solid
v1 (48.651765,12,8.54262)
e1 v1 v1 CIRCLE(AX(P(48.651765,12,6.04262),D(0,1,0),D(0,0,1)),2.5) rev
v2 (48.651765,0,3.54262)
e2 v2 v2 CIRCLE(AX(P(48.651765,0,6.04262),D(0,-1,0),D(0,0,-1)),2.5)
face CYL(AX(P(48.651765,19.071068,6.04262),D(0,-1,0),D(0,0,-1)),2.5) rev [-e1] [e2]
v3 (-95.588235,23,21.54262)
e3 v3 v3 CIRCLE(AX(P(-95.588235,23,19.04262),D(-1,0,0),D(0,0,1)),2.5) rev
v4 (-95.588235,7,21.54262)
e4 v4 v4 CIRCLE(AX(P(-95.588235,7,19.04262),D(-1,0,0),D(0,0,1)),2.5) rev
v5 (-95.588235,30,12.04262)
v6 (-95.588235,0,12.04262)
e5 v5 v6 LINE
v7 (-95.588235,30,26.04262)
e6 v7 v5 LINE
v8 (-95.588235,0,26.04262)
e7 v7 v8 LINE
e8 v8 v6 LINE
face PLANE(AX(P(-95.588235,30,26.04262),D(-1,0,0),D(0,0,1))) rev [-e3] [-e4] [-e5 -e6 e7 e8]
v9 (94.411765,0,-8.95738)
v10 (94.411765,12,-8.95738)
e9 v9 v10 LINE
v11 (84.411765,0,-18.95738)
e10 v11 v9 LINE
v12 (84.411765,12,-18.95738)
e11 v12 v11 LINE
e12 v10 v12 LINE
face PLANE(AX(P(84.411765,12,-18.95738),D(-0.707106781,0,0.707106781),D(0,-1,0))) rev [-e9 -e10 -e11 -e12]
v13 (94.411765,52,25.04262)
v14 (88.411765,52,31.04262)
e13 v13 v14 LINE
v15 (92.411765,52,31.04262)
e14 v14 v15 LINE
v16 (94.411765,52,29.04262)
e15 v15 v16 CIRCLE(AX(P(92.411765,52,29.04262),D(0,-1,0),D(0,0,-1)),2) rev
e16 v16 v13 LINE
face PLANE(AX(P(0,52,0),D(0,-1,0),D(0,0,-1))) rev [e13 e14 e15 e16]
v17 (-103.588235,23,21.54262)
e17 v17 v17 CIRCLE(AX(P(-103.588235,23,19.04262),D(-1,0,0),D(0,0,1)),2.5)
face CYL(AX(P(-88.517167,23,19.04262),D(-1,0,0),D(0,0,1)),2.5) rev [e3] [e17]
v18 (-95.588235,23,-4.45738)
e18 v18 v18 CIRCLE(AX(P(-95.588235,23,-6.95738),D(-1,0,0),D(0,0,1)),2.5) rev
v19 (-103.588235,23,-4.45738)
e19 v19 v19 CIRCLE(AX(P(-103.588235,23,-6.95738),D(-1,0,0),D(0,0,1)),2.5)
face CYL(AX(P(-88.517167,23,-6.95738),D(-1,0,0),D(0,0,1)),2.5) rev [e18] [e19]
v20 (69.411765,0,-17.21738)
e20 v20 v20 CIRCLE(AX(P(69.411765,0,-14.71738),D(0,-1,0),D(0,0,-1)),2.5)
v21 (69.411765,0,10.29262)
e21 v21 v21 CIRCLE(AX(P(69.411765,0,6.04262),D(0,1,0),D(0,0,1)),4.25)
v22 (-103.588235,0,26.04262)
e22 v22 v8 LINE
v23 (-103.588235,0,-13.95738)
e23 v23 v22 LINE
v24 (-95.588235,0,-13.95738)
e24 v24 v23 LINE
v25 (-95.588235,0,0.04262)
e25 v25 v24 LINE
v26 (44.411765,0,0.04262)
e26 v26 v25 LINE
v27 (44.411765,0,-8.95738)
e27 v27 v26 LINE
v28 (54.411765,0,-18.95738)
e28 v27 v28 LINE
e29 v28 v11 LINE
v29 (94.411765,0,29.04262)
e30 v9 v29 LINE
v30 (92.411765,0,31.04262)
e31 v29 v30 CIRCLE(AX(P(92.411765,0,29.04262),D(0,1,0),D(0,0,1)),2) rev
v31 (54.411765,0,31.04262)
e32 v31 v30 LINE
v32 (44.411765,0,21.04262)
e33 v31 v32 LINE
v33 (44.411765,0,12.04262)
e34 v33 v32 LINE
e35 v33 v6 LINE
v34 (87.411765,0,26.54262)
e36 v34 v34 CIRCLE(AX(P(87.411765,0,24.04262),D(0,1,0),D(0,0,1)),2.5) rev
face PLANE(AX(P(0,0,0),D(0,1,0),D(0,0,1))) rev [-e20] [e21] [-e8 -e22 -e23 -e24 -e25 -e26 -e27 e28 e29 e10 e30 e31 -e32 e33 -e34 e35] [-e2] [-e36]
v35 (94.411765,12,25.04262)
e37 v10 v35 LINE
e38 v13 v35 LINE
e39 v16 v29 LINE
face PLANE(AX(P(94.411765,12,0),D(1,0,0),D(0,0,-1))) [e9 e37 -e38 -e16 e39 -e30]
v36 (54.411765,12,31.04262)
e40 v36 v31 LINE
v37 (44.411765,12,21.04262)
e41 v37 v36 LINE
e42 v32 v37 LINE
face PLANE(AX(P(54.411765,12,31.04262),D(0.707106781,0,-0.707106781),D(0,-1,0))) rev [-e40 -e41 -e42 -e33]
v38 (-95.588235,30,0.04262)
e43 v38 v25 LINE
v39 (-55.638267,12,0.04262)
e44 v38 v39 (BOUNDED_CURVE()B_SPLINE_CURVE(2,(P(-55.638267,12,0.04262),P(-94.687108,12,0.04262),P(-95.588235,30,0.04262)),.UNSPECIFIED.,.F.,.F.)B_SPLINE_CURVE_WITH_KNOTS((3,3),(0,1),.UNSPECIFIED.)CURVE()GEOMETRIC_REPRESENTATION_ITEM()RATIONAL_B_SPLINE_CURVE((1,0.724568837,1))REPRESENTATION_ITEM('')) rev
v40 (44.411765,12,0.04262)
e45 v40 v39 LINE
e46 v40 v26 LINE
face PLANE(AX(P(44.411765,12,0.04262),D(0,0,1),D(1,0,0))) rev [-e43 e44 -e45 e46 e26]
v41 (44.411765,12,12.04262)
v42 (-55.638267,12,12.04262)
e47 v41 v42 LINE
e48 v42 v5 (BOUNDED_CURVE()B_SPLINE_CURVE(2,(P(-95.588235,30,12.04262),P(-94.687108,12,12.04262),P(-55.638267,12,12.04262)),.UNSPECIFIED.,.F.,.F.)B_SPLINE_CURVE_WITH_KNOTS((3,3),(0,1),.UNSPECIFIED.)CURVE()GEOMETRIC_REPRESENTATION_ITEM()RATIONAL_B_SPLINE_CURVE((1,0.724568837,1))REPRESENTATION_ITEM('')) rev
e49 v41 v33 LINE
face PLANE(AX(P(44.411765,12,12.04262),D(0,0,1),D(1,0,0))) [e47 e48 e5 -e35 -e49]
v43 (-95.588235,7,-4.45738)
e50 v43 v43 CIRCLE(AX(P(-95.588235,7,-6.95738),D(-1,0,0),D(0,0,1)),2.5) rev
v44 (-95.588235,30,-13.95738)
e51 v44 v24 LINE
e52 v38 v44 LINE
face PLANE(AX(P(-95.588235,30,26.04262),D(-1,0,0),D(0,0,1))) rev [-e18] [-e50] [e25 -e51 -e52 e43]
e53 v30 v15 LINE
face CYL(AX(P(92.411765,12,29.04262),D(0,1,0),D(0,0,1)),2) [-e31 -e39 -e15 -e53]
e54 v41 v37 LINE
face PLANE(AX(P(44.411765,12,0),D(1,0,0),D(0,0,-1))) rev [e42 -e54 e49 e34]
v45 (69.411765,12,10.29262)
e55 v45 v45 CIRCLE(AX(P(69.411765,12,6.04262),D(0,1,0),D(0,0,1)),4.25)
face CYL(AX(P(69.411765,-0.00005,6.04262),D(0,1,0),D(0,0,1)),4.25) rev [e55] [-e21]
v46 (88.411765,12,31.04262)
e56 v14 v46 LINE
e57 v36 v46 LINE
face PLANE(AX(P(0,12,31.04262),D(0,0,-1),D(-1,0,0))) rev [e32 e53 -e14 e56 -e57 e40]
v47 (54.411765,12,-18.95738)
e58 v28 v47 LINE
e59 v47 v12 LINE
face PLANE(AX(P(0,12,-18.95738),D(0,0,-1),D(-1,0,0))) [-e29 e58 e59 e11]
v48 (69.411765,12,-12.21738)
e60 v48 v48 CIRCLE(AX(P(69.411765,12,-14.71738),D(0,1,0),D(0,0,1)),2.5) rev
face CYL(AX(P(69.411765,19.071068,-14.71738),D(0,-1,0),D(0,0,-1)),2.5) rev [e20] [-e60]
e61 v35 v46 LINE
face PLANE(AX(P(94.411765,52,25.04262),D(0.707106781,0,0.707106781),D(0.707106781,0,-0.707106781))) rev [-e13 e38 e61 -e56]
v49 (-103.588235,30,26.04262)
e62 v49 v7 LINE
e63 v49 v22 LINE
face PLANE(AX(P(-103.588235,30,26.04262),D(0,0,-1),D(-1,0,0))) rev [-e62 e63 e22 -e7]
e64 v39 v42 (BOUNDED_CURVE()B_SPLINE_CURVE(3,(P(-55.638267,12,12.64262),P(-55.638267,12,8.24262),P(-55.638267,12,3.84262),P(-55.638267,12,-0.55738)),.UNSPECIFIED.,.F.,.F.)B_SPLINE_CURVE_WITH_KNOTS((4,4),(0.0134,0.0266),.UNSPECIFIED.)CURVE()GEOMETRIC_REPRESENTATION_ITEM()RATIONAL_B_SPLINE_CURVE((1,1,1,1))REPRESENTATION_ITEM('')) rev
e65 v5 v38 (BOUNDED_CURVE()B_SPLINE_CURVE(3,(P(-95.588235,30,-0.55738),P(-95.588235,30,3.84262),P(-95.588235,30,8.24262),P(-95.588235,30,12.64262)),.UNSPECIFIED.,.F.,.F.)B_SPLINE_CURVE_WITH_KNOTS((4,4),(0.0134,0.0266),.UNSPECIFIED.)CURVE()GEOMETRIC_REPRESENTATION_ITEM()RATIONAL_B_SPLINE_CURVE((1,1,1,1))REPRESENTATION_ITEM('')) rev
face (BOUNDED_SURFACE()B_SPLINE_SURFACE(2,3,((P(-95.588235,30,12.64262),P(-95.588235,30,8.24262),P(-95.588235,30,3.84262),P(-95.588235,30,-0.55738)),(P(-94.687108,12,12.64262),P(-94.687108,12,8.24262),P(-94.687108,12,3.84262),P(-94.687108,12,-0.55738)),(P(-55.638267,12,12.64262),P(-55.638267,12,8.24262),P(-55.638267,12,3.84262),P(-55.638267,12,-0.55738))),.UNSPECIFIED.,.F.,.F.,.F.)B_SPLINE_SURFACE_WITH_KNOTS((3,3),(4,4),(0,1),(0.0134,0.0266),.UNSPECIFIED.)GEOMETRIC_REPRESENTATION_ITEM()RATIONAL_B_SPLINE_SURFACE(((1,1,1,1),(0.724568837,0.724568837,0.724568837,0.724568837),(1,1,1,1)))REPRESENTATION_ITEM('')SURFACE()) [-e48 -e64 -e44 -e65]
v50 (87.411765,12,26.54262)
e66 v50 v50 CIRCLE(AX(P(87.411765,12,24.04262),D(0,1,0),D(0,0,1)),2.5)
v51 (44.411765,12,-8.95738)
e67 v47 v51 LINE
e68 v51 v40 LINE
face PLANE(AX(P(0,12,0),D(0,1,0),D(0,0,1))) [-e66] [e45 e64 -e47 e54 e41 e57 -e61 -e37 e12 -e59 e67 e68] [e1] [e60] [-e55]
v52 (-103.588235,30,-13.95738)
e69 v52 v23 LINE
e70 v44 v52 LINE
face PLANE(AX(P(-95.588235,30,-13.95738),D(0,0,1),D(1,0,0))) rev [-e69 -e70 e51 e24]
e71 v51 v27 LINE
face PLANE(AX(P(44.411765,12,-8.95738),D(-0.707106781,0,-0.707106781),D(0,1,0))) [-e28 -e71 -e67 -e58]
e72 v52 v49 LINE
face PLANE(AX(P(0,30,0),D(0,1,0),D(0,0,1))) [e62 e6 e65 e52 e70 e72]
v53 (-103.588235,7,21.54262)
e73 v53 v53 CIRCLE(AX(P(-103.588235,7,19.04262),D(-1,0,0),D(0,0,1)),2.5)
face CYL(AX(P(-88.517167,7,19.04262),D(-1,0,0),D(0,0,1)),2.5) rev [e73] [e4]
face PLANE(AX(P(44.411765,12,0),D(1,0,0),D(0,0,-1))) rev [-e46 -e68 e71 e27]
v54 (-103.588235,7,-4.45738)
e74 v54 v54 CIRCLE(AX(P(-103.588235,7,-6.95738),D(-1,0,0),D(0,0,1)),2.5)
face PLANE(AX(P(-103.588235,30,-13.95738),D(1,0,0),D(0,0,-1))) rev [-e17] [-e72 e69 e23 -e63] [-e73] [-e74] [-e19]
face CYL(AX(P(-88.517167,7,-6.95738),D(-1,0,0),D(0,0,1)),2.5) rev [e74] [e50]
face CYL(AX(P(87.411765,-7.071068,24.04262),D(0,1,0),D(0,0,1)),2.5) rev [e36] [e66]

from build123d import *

# Parameters (mm, degrees)
ESQUISSE1_W                 = 50
ESQUISSE1_H                 = 50
ESQUISSE1_W_2               = 140
ESQUISSE1_H_2               = 12
BOSS_EXTRU_2_DEPTH          = 12
BOSS_EXTRU_3_DEPTH          = 30
ESQUISSE3_R                 = 4.25
ENL_V_MAT_EXTRU_1_DEPTH     = 110.627399686
ESQUISSE4_R                 = 2.5
ENL_V_MAT_EXTRU_2_DEPTH     = 8
CHANFREIN2_SIZE             = 10
CONG_1_START                = 0.042620229
CONG_1_DEPTH                = 12
BOSS_EXTRU_4_DEPTH          = 40
ENL_V_START                 = -12
ENL_V_MAT_EXTRU_3_OUTLINE_R = 2.5
ENL_V_MAT_EXTRU_3_DEPTH     = 52
ESQUISSE8_R                 = 2.5
ENL_V_MAT_EXTRU_4_DEPTH     = 12


with BuildPart() as part:
    # Esquisse1 → Boss.-Extru.2 (new body)
    with BuildSketch(Plane(origin=(0, 0, 0), x_dir=(1, 0, 0), z_dir=(0, 1, 0))):
        with Locations((69.411764706, -6.042620229)):
            Rectangle(ESQUISSE1_W, ESQUISSE1_H)
        with Locations((-25.588235294, -6.042620229)):
            Rectangle(ESQUISSE1_W_2, ESQUISSE1_H_2)
    extrude(amount=BOSS_EXTRU_2_DEPTH)

    # Esquisse2 → Boss.-Extru.3 (add)
    with BuildSketch(Plane(origin=(0, 0, 0), x_dir=(1, 0, 0), z_dir=(0, 1, 0))):
        Polygon((-95.588235294, -0.042620229), (-95.588235294, 13.957379771), (-103.588235294, 13.957379771), (-103.588235294, -26.042620229), (-95.588235294, -26.042620229), (-95.588235294, -12.042620229), align=None)
    extrude(amount=BOSS_EXTRU_3_DEPTH)

    # Esquisse3 → Enlèv. mat.-Extru.1 (cut, through all)
    with BuildSketch(Plane(origin=(0, 12, 0), x_dir=(1, 0, 0), z_dir=(0, 1, 0))):
        with Locations(Location((69.411764706, -6.042620229, 0), (0, 0, 270))):
            Circle(ESQUISSE3_R)
    extrude(amount=-ENL_V_MAT_EXTRU_1_DEPTH, mode=Mode.SUBTRACT)

    # Esquisse4 → Enlèv. mat.-Extru.2 (cut)
    with BuildSketch(Plane.ZY.offset(103.588235294)):
        with Locations((-6.957379771, 7)):
            Circle(ESQUISSE4_R)
        with Locations((19.042620229, 7)):
            Circle(ESQUISSE4_R)
        with Locations((19.042620229, 23)):
            Circle(ESQUISSE4_R)
        with Locations((-6.957379771, 23)):
            Circle(ESQUISSE4_R)
    extrude(amount=-ENL_V_MAT_EXTRU_2_DEPTH, mode=Mode.SUBTRACT)

    # Chanfrein2
    chanfrein2_edges = [part.edges().sort_by_distance(p)[0] for p in [
        (44.411764706, 6, 31.042620229),
        (44.411764706, 6, -18.957379771),
        (94.411764706, 6, -18.957379771),
    ]]
    chamfer(chanfrein2_edges, length=CHANFREIN2_SIZE)

    # Congé1: read off the stored shape, not the designer's step
    # Congé1 outline → Congé1 (add)
    with BuildSketch(Plane.XY.offset(CONG_1_START)):
        with BuildLine():
            add(Edge.make_bspline(
                [(-95.588235294, 30), (-94.68710818, 12), (-55.638266583, 12)],
                knots=[0, 0, 0, 1, 1, 1], degree=2, weights=[1, 0.724568837, 1]))
            Line((-95.588235294, 30), (-95.588235294, 12))
            Line((-95.588235294, 12), (-55.638266583, 12))
        make_face()
    extrude(amount=CONG_1_DEPTH)

    # Esquisse6 → Boss.-Extru.4 (add)
    with BuildSketch(Plane(origin=(0, 12, 0), x_dir=(1, 0, 0), z_dir=(0, 1, 0))):
        Polygon((94.411764706, -25.042620229), (88.411764706, -31.042620229), (94.411764706, -31.042620229), align=None)
    extrude(amount=BOSS_EXTRU_4_DEPTH)

    # Enlèv. mat.-Extru.3: read off the stored shape, not the designer's step
    # Enlèv. mat.-Extru.3 outline → Enlèv. mat.-Extru.3 (cut)
    with BuildSketch(Plane(origin=(0, 12, 0), x_dir=(1, 0, 0), z_dir=(0, 1, 0)).offset(ENL_V_START)):
        with BuildLine():
            ThreePointArc((94.411764706, -29.042620229), (93.825978268, -30.456833791), (92.411764706, -31.042620229))
            Line((92.411764706, -31.042620229), (94.411764706, -31.042620229))
            Line((94.411764706, -31.042620229), (94.411764706, -29.042620229))
        make_face()
        with Locations((87.411764706, -24.042620229)):
            Circle(ENL_V_MAT_EXTRU_3_OUTLINE_R)
    extrude(amount=ENL_V_MAT_EXTRU_3_DEPTH, mode=Mode.SUBTRACT)

    # Esquisse8 → Enlèv. mat.-Extru.4 (cut)
    with BuildSketch(Plane.XZ):
        with Locations(Location((48.651764706, 6.042620229, 0), (0, 0, 270))):
            Circle(ESQUISSE8_R)
        with Locations(Location((69.411764706, -14.717379771, 0), (0, 0, 270))):
            Circle(ESQUISSE8_R)
    extrude(amount=-ENL_V_MAT_EXTRU_4_DEPTH, mode=Mode.SUBTRACT)


solid = part.part
